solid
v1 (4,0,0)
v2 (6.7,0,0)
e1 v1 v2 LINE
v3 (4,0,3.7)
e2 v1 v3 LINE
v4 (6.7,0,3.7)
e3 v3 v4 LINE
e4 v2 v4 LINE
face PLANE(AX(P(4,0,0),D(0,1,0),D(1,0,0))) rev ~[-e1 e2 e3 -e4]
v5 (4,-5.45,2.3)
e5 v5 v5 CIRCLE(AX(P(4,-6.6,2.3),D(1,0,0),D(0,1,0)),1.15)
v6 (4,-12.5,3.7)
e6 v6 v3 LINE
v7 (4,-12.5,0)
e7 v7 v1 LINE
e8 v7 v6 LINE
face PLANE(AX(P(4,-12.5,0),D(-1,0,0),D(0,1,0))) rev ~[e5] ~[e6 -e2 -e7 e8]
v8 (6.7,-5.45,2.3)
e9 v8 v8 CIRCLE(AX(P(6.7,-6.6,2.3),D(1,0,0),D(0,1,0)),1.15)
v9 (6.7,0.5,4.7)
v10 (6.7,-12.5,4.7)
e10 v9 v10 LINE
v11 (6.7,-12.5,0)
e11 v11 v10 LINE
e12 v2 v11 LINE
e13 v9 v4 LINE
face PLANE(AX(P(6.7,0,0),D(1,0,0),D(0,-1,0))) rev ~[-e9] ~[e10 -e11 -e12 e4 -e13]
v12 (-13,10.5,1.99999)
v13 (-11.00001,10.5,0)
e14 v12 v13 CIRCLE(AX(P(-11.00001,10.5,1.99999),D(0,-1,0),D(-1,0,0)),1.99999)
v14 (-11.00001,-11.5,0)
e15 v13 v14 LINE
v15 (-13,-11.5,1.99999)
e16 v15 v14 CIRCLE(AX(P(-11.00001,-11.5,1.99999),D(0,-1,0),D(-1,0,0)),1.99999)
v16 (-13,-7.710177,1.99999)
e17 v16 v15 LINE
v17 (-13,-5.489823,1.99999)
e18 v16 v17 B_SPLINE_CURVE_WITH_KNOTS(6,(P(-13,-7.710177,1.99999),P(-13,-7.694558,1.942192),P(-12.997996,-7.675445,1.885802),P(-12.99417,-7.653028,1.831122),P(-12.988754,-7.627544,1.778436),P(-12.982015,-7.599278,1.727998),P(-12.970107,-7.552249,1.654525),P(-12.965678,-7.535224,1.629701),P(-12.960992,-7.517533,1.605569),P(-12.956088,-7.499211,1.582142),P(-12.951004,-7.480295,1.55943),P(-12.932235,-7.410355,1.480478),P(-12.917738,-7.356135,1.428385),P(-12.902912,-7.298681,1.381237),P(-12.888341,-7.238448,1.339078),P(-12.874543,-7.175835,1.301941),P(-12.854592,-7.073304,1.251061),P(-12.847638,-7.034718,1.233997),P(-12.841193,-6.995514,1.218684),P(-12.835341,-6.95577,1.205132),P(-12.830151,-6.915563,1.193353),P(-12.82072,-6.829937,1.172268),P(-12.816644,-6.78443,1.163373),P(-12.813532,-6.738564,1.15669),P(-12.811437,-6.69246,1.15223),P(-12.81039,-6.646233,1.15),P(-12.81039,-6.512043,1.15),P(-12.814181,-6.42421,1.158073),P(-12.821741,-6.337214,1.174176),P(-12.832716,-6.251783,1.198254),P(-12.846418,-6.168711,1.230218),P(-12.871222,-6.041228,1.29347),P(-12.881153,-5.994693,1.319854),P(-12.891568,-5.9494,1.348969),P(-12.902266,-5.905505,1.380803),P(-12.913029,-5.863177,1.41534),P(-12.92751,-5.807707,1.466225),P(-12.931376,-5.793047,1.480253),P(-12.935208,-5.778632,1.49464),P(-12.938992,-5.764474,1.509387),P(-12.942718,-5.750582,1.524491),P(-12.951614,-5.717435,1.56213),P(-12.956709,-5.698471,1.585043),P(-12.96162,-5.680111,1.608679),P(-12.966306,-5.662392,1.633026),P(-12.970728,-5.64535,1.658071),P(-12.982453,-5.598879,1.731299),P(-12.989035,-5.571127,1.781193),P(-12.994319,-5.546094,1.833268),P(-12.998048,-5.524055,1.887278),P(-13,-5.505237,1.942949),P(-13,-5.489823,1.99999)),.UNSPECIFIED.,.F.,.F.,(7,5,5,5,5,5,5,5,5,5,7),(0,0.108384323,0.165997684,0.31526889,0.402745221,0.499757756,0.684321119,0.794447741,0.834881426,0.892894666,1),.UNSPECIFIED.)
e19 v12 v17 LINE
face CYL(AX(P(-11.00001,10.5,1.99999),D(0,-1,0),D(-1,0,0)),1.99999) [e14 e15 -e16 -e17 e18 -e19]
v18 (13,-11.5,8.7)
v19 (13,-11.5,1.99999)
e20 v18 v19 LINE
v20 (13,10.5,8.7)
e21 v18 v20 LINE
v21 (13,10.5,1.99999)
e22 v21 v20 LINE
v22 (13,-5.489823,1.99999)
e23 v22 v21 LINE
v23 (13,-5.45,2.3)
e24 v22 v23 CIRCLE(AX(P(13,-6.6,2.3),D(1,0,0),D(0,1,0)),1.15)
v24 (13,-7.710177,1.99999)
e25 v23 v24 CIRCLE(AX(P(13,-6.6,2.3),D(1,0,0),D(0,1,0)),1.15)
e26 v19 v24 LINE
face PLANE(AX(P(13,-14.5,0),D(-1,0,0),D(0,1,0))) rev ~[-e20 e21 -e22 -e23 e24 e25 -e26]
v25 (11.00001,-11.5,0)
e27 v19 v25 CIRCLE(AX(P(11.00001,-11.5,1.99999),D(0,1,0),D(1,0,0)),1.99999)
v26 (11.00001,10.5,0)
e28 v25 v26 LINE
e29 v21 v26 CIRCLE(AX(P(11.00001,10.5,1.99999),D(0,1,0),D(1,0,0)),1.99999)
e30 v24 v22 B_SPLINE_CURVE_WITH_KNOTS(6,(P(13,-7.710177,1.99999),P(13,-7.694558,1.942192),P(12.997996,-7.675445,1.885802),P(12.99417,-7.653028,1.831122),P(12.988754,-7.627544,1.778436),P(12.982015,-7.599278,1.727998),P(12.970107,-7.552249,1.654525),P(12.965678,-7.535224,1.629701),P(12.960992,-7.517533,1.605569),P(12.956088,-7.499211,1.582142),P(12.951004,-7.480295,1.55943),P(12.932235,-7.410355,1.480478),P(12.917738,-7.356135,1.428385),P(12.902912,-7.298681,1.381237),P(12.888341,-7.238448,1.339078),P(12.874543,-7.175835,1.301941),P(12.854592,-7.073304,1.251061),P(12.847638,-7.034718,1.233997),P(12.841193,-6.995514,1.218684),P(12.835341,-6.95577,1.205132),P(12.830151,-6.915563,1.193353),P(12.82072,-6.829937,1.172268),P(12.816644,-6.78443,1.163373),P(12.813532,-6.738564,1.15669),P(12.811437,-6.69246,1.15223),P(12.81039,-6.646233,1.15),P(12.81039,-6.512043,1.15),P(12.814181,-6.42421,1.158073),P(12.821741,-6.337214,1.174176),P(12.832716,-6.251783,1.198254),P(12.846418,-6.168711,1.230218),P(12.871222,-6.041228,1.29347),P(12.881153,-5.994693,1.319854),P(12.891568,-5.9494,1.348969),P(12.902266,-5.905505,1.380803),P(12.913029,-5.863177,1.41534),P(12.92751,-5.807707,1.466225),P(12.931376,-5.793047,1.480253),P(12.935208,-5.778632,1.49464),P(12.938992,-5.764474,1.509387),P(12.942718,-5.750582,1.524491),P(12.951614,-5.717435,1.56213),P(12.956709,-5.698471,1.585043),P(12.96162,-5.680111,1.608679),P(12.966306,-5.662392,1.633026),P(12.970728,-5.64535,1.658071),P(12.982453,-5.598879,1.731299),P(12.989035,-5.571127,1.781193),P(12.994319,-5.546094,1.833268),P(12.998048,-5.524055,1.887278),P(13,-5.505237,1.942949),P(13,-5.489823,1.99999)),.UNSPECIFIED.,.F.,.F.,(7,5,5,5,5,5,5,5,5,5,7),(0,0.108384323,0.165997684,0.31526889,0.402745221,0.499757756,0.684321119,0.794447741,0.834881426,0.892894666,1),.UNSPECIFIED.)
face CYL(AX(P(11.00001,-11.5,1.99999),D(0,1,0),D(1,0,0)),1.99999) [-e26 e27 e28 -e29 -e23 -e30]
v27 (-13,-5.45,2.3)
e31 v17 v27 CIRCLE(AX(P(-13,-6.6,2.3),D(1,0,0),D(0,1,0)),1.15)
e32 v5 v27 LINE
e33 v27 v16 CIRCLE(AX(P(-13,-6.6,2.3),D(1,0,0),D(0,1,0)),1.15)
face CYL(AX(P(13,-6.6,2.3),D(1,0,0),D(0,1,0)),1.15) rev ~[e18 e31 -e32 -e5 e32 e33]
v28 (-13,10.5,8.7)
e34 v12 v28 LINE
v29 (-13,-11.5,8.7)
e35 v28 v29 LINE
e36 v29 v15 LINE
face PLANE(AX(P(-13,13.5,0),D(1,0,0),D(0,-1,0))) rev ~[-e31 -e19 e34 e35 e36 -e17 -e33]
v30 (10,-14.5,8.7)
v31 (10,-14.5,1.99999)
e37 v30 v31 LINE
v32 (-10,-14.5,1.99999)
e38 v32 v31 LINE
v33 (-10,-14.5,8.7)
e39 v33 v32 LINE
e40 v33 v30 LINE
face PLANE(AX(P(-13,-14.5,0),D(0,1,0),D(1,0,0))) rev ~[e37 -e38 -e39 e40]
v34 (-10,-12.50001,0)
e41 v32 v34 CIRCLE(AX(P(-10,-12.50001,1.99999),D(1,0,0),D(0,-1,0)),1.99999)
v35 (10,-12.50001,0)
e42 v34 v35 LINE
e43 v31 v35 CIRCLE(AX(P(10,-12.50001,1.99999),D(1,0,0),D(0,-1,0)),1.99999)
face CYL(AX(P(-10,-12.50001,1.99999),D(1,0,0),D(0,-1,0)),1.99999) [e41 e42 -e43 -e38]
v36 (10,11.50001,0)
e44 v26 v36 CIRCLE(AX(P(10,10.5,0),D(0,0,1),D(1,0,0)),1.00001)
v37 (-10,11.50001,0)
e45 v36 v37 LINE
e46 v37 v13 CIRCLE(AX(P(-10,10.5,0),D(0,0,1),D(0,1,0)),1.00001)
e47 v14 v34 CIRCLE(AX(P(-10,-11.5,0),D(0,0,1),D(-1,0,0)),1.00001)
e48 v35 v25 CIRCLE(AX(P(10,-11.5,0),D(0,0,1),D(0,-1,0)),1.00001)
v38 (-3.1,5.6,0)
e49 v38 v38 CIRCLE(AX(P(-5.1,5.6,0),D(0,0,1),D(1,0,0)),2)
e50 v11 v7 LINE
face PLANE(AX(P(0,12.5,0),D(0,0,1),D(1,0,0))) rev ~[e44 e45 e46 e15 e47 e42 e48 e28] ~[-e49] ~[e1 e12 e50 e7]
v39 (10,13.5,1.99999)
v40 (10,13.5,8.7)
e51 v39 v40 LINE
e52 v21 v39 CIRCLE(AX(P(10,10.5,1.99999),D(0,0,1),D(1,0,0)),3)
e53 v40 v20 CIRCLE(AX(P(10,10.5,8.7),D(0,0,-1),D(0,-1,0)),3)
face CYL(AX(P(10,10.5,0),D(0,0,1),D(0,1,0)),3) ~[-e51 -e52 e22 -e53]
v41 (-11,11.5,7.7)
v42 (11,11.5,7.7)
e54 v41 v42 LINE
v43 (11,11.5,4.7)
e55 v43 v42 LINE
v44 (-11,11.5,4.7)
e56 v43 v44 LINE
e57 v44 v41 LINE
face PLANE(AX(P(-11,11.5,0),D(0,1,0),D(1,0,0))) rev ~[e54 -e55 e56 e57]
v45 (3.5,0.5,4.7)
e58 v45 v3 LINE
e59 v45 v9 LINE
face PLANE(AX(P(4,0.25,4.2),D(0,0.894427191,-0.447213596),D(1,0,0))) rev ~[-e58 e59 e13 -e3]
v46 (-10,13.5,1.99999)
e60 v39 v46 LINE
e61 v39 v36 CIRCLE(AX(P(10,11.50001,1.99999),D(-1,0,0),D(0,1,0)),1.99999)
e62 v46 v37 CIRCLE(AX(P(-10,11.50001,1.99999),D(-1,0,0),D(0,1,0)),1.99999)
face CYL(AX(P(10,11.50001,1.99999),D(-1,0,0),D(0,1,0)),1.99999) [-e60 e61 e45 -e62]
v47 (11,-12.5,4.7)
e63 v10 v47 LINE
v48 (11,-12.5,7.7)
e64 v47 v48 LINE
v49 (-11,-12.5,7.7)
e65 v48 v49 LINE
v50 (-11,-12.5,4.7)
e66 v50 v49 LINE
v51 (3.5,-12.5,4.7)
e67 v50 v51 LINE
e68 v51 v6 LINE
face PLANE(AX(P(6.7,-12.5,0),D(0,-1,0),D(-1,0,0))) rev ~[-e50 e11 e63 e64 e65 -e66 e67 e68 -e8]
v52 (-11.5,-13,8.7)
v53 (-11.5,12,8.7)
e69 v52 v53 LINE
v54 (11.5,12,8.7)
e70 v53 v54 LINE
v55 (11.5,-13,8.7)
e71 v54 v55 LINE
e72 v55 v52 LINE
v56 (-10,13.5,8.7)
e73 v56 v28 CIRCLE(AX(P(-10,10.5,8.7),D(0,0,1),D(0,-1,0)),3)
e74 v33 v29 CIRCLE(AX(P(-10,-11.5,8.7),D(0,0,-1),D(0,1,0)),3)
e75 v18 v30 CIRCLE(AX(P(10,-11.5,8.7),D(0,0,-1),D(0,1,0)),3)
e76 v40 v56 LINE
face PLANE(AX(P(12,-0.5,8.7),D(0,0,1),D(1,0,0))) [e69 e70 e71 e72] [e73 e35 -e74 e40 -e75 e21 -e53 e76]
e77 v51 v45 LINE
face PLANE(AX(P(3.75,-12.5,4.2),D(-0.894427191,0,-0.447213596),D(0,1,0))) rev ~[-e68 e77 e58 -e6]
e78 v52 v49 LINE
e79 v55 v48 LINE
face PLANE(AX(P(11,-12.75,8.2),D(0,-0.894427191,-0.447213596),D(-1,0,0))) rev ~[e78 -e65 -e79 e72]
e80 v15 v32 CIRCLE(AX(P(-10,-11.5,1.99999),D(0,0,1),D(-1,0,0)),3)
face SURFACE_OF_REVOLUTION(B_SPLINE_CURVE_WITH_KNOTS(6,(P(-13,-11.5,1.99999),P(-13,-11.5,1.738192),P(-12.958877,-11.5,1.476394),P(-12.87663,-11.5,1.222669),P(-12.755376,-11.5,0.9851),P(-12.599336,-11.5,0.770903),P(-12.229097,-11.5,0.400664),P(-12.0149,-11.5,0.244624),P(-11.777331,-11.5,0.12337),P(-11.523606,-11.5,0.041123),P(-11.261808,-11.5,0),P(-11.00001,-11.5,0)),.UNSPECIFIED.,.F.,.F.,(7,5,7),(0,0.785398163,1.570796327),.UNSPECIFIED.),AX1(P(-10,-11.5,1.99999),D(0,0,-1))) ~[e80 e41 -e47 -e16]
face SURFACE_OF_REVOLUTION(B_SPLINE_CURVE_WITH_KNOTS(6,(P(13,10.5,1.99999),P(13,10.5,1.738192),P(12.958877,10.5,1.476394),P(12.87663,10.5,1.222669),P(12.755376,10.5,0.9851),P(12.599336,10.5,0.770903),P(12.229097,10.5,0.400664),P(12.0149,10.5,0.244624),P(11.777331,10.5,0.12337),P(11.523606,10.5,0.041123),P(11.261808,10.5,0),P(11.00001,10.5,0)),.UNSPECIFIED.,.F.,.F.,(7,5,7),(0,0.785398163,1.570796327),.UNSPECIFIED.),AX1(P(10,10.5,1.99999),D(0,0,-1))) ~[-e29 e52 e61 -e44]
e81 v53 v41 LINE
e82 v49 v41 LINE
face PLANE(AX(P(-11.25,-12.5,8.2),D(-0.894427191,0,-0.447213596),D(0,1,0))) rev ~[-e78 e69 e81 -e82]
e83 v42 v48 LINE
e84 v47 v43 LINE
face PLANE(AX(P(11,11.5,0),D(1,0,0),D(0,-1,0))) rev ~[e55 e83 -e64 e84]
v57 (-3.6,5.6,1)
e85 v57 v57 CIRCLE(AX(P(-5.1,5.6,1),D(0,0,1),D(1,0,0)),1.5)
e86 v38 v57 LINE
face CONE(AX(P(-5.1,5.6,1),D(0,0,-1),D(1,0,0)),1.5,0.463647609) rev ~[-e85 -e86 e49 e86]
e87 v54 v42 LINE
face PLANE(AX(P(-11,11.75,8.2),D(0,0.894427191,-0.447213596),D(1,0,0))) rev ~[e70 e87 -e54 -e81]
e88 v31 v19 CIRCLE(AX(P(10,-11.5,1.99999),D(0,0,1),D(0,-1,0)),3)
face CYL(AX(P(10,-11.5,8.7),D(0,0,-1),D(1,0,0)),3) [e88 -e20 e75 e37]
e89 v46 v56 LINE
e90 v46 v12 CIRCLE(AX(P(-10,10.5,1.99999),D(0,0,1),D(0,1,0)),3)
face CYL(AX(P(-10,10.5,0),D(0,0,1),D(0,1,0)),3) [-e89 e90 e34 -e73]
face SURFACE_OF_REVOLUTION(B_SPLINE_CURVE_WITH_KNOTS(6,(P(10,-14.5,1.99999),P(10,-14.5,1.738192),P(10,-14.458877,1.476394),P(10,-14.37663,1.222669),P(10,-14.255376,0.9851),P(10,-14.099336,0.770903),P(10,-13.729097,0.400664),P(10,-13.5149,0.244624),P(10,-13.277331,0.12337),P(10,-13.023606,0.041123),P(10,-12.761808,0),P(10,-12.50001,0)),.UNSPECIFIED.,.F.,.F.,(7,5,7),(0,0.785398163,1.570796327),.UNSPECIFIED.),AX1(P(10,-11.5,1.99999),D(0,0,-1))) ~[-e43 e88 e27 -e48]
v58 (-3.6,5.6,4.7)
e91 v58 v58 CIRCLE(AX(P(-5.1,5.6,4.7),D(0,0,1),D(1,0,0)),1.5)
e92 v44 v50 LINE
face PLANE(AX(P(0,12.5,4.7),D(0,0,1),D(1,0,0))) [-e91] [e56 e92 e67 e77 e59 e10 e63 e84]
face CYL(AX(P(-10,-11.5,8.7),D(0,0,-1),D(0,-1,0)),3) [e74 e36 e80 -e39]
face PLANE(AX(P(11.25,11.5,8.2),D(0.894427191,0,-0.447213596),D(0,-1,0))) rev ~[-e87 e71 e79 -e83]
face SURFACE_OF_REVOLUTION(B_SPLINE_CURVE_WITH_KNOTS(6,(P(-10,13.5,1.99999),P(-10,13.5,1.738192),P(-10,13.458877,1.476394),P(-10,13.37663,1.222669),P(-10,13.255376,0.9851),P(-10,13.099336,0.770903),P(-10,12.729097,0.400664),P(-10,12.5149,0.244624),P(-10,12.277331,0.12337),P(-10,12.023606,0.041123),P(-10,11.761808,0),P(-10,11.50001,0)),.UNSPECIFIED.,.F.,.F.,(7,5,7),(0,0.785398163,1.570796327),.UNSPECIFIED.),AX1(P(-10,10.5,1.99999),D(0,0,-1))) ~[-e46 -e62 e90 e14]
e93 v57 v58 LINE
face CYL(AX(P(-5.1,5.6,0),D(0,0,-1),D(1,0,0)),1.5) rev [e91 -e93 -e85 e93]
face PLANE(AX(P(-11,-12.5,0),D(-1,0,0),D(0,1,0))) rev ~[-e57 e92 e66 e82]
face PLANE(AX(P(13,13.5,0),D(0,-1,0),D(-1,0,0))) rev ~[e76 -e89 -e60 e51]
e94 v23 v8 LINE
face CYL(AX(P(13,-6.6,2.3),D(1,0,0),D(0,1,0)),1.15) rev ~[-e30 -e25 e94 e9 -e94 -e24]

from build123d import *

# Parameters (mm, degrees)
F0_W       = 22
F0_H       = 2
F0_R       = 1.5
F1_DEPTH   = 4.7
F2_DEPTH   = 8.7
F3_R       = 1.5
F4_DEPTH   = 4.701
F6_SIZE2   = 1
F6_SIZE    = 0.5
F6_2_SIZE2 = 1
F6_2_SIZE  = 0.5
F6_3_SIZE2 = 1
F6_3_SIZE  = 0.5
F7_R       = 3
F8_R       = 1.99999
F5_R       = 1.15
F9_DEPTH   = 26.0010001


# Not quite as in the source:
# - a fillet or chamfer is up to 0.001 mm smaller than in the source, because OpenCascade refuses the exact size


with BuildPart() as f1:
    # F0 (on Top) → F1 (new body)
    with BuildSketch(Plane.XY):
        with Locations((0, 12.5)):
            Rectangle(F0_W, F0_H)
        Polygon((-11, -12.5), (-11, 11.5), (-11, 13.5), (-13, 13.5), (-13, -14.5), (-11, -14.5), align=None)
        Polygon((11, 13.5), (11, 11.5), (11, -12.5), (11, -14.5), (13, -14.5), (13, 13.5), align=None)
        Polygon((4, -12.5), (-11, -12.5), (-11, -14.5), (11, -14.5), (11, -12.5), (6.7, -12.5), align=None)
        Polygon((11, 11.5), (-11, 11.5), (-11, -12.5), (4, -12.5), (4, 0), (6.7, 0), (6.7, -12.5), (11, -12.5), align=None)
        with Locations((-5.1, 5.6)):
            Circle(F0_R, mode=Mode.SUBTRACT)
    extrude(amount=F1_DEPTH)

    # F0 (on Top) → F2 (join)
    with BuildSketch(Plane.XY):
        Polygon((11, 13.5), (11, 11.5), (11, -12.5), (11, -14.5), (13, -14.5), (13, 13.5), align=None)
        Polygon((4, -12.5), (-11, -12.5), (-11, -14.5), (11, -14.5), (11, -12.5), (6.7, -12.5), align=None)
        Polygon((-11, -12.5), (-11, 11.5), (-11, 13.5), (-13, 13.5), (-13, -14.5), (-11, -14.5), align=None)
        with Locations((0, 12.5)):
            Rectangle(F0_W, F0_H)
    extrude(amount=F2_DEPTH)

    # F3 (on face) → F4 (cut, through all)
    with BuildSketch(Plane.XY.offset(4.7)):
        with Locations((-5.1, 5.6)):
            Circle(F3_R)
    extrude(amount=-F4_DEPTH, mode=Mode.SUBTRACT)

    # F6
    f6_edges = [f1.edges().sort_by_distance(p)[0] for p in [
        (0, 11.5, 8.7),
        (11, -0.5, 8.7),
        (-11, -0.5, 8.7),
        (0, -12.5, 8.7),
    ]]
    f6_side = f1.faces().sort_by_distance((11.382099, -0.5, 8.7))[0]
    chamfer(f6_edges, length=F6_SIZE, length2=F6_SIZE2, reference=f6_side)

    # F6#2
    f6_2_edges = [f1.edges().sort_by_distance(p)[0] for p in [
        (-6.6, 5.6, 0),
    ]]
    f6_2_side = f1.faces().sort_by_distance((-0.210298, -0.280343, 0))[0]
    chamfer(f6_2_edges, length=F6_2_SIZE, length2=F6_2_SIZE2, reference=f6_2_side)

    # F6#3
    f6_3_edges = [f1.edges().sort_by_distance(p)[0] for p in [
        (5.35, 0, 4.7),
        (4, -6.25, 4.7),
    ]]
    f6_3_side = f1.faces().sort_by_distance((-0.29663, -0.190169, 4.7))[0]
    chamfer(f6_3_edges, length=F6_3_SIZE, length2=F6_3_SIZE2, reference=f6_3_side)

    # F7
    f7_edges = [f1.edges().sort_by_distance(p)[0] for p in [
        (-13, -14.5, 4.35),
        (13, -14.5, 4.35),
        (-13, 13.5, 4.35),
        (13, 13.5, 4.35),
    ]]
    fillet(f7_edges, radius=F7_R)

    # F8 (radius 2 in the source; OpenCascade refuses exactly that, so slightly less here)
    f8_edges = [f1.edges().sort_by_distance(p)[0] for p in [
        (13, -0.5, 0),
        (12.12132, -13.62132, 0),
        (0, -14.5, 0),
        (-12.12132, -13.62132, 0),
        (12.12132, 12.62132, 0),
        (0, 13.5, 0),
        (-12.12132, 12.62132, 0),
        (-13, -0.5, 0),
    ]]
    fillet(f8_edges, radius=F8_R)

    # F5 (on face) → F9 (cut, through all)
    with BuildSketch(Plane.YZ.offset(13)):
        with Locations((-6.6, 2.3)):
            Circle(F5_R)
    extrude(amount=-F9_DEPTH, mode=Mode.SUBTRACT)


solid = f1.part
